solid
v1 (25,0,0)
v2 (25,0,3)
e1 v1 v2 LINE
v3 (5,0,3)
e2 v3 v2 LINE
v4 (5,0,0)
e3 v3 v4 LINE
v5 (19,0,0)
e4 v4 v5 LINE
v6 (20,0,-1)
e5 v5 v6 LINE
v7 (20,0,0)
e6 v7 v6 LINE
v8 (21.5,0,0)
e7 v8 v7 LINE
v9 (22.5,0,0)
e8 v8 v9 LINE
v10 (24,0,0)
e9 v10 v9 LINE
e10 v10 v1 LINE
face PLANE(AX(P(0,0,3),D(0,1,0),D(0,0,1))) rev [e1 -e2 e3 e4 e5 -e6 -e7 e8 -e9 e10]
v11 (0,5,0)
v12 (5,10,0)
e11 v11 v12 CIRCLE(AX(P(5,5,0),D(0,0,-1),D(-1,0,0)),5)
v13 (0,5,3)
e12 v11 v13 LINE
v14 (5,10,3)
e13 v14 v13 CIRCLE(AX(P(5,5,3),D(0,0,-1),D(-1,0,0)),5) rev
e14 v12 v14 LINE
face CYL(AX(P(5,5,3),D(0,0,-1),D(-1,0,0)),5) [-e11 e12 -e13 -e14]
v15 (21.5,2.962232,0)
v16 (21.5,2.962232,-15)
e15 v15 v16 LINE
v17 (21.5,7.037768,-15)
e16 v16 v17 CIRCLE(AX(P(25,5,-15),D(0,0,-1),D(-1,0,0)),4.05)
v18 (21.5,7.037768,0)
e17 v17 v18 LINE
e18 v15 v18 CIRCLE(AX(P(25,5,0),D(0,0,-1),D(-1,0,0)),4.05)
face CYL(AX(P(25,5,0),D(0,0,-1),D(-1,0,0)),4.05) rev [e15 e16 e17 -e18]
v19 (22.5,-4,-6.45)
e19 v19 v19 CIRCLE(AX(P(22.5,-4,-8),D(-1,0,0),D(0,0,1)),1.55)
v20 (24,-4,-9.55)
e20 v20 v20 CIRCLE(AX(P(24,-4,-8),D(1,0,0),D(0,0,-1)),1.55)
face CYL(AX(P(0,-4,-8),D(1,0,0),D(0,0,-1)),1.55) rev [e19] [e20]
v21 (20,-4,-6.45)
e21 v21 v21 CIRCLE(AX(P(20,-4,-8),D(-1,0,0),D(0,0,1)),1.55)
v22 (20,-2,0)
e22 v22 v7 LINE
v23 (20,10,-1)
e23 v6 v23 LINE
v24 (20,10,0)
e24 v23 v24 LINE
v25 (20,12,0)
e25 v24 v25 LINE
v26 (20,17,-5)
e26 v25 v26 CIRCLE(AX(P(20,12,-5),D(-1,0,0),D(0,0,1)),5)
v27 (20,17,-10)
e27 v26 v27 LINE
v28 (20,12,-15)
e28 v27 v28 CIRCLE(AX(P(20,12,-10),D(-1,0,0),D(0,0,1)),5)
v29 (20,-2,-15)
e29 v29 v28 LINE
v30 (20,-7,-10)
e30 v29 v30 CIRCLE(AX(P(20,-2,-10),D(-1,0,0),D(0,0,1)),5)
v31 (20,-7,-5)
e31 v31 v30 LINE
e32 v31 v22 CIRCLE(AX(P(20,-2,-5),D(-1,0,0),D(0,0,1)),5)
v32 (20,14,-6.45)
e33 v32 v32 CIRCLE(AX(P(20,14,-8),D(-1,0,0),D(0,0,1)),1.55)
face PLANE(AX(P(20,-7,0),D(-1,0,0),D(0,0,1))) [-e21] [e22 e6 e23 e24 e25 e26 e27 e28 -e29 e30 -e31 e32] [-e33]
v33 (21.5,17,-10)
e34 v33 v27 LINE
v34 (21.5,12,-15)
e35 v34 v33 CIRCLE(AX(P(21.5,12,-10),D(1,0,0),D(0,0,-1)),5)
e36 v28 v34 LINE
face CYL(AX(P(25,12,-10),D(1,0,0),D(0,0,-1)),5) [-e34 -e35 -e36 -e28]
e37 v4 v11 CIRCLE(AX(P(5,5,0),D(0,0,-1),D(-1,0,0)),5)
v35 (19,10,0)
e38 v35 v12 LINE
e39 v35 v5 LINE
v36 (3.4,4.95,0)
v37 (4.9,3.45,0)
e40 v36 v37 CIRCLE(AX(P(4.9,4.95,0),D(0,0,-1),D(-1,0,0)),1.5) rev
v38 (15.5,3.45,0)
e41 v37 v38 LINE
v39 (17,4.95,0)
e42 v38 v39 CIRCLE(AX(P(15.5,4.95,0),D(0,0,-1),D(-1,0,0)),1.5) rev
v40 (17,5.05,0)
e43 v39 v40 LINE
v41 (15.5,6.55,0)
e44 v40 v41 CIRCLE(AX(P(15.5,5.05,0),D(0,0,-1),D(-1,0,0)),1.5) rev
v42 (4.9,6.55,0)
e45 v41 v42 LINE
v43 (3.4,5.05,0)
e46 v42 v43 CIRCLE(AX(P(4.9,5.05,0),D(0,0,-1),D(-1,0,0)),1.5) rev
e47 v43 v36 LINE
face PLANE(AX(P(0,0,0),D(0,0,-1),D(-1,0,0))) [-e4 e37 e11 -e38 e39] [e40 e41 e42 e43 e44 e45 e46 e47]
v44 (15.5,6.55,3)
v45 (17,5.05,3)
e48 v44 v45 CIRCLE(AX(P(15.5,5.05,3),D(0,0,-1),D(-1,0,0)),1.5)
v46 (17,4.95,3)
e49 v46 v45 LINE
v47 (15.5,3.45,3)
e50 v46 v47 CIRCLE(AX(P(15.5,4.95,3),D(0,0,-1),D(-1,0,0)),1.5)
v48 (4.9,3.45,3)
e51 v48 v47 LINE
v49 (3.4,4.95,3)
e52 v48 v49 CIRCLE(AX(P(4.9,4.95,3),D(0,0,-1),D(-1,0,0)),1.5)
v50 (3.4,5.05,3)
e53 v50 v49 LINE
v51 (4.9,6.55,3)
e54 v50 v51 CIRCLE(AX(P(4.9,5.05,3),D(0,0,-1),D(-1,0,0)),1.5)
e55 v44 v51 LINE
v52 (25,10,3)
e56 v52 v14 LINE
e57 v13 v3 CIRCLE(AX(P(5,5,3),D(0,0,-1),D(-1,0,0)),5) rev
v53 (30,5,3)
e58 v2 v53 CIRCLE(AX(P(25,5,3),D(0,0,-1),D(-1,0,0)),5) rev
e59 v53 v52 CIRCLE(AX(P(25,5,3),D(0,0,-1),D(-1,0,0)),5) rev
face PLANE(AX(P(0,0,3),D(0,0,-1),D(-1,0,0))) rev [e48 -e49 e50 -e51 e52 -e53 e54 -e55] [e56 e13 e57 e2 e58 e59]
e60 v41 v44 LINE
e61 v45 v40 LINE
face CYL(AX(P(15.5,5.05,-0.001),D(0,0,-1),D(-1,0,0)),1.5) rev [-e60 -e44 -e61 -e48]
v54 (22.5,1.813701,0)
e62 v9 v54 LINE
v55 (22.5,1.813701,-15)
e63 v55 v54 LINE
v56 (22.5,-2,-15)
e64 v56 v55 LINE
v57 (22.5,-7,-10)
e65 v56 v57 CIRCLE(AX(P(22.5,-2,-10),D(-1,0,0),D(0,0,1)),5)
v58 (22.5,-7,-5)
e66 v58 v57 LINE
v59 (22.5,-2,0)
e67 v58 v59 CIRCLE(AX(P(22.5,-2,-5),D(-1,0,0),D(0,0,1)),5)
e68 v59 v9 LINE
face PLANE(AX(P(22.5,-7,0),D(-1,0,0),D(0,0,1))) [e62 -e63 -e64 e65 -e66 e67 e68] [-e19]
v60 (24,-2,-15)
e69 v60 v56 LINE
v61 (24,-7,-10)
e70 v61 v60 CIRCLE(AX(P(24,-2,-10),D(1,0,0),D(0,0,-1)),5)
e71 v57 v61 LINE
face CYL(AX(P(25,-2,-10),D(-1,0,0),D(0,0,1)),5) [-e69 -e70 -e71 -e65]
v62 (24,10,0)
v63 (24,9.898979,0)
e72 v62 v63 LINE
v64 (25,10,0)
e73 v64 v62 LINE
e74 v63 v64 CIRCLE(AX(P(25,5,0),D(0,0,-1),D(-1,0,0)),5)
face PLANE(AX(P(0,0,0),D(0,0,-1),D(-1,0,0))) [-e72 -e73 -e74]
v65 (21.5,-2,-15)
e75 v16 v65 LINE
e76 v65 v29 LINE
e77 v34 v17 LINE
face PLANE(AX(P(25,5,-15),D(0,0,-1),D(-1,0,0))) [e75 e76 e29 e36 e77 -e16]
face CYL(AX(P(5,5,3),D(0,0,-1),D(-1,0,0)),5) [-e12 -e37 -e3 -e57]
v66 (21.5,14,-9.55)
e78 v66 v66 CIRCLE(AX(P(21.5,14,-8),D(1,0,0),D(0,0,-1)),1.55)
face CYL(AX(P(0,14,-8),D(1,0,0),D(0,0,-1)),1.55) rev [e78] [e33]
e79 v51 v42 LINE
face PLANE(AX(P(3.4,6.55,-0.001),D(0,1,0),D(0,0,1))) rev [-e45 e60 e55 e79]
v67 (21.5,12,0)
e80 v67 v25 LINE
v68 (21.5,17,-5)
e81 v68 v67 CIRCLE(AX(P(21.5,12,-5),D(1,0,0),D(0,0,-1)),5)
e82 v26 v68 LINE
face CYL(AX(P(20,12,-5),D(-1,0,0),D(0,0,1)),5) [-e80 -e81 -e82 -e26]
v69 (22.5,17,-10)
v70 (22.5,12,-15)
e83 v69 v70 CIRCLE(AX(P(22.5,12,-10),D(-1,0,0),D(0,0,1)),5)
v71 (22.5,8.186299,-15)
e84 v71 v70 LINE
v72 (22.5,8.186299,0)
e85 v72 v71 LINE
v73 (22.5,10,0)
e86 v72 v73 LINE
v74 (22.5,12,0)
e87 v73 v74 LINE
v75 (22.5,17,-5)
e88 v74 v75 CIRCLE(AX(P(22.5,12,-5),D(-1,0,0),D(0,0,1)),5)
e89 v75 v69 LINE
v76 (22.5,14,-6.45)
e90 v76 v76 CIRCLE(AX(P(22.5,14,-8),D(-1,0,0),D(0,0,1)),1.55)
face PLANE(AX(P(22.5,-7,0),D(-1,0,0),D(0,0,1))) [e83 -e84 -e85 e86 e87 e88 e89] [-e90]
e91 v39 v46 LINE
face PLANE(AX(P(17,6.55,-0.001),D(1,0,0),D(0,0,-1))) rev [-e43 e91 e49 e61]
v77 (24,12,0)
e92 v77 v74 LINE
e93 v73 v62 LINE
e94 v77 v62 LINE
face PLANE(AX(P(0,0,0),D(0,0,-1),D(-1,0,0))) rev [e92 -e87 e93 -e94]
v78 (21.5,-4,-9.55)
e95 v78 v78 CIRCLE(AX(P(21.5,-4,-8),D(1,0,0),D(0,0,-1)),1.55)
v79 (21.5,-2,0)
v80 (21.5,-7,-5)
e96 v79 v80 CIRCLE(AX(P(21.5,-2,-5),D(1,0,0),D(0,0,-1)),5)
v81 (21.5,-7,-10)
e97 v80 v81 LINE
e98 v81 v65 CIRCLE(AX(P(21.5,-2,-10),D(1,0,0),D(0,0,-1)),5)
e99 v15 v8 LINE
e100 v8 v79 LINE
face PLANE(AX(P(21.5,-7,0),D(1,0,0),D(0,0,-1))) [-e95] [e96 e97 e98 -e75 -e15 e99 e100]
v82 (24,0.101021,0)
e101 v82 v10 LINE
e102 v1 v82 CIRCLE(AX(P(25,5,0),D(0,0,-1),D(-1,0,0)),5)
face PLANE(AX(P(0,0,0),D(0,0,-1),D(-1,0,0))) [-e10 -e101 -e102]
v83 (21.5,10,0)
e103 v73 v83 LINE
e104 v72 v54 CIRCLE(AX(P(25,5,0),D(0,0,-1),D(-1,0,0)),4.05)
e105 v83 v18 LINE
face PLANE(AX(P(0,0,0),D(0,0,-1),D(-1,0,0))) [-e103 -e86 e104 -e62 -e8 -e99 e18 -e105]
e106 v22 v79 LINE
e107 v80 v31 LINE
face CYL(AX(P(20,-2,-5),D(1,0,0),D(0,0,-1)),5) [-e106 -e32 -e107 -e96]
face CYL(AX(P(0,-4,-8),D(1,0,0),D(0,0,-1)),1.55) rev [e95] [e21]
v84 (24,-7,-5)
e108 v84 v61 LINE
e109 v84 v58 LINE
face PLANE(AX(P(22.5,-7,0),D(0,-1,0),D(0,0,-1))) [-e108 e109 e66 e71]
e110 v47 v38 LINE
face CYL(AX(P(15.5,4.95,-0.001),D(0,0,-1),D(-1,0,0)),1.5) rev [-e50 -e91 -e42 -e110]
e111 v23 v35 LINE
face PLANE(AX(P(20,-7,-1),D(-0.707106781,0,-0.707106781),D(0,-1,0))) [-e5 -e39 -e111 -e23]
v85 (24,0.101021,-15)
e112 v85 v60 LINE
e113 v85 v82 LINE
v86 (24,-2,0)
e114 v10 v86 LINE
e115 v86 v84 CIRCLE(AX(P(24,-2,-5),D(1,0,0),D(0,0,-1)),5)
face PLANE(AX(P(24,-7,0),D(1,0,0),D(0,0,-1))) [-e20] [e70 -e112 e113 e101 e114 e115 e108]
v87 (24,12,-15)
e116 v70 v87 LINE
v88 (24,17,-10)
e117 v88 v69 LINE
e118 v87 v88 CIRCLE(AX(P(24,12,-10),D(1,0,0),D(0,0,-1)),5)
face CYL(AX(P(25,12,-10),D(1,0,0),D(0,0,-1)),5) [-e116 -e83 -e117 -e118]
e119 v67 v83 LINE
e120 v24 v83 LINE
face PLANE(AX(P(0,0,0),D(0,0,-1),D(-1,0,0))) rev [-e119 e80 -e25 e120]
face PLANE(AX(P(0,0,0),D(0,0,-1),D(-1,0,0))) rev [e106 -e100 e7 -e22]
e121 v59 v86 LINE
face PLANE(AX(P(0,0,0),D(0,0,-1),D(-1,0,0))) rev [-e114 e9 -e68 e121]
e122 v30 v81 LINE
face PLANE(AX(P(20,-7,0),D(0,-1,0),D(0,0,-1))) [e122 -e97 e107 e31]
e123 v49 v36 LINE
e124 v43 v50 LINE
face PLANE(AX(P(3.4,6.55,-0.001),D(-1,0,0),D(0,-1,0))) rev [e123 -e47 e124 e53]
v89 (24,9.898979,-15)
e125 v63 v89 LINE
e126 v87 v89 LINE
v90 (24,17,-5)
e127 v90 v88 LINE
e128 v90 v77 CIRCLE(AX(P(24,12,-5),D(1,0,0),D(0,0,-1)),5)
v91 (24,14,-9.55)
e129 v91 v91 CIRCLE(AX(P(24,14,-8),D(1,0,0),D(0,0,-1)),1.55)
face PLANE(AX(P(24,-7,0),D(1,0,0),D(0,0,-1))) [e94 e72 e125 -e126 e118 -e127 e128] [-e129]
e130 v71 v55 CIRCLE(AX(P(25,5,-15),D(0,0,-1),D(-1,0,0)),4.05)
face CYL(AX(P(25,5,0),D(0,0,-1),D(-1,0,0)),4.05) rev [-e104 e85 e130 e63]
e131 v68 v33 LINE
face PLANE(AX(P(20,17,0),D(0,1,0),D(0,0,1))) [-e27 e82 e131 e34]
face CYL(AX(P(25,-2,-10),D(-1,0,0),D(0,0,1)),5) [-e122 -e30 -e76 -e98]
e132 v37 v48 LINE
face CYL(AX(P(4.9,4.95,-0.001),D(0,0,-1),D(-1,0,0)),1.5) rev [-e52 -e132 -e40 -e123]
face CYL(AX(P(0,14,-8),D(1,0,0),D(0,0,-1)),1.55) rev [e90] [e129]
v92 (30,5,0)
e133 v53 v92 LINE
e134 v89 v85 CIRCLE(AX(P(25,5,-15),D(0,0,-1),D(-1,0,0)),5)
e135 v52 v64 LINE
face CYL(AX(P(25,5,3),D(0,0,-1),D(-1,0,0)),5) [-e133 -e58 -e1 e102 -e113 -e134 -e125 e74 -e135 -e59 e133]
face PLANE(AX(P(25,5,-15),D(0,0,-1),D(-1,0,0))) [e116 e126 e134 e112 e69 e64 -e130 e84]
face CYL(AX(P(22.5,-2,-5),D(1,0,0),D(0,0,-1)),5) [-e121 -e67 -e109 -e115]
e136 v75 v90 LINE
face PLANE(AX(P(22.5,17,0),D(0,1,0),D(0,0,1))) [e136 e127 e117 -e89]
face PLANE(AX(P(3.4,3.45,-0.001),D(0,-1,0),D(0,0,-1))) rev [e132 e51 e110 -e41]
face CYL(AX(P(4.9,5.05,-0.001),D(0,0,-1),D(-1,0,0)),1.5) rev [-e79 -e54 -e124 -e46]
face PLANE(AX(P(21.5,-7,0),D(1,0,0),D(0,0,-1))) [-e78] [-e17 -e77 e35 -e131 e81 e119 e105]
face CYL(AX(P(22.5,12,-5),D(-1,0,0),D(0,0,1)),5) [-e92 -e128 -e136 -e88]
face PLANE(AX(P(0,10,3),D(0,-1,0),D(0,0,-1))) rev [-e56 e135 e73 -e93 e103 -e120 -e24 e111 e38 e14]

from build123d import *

# Parameters (mm, degrees)
SZKIC1_W                    = 30
SZKIC1_H                    = 10
DODANIE_WYCI_GNI_CIE1_DEPTH = 3
ZAOKR_GLENIE1_R             = 5
WYTNIJ_WYCI_GNI_CIE1_REACH  = 33.765
SZKIC2_W                    = 13.6
SZKIC2_H                    = 3.1
ZAOKR_GLENIE2_R             = 1.5
SZKIC3_R                    = 5
DODANIE_WYCI_GNI_CIE2_DEPTH = 15
SZKIC5_W                    = 1.5
SZKIC5_H                    = 24
DODANIE_WYCI_GNI_CIE3_DEPTH = 15
SZKIC4_R                    = 4.05
WYTNIJ_WYCI_GNI_CIE2_DEPTH  = 15
SZKIC6_W                    = 1
SZKIC6_H                    = 10.631374676
WYTNIJ_WYCI_GNI_CIE3_DEPTH  = 15
SZKIC7_R                    = 1.55
WYTNIJ_WYCI_GNI_CIE4_DEPTH  = 34.015148038
ZAOKR_GLENIE3_R             = 5
SFAZOWANIE1_SIZE            = 1


with BuildPart() as part:
    # Szkic1 → Dodanie-wyciągnięcie1 (new body)
    with BuildSketch(Plane.XY):
        with Locations((15, 5)):
            Rectangle(SZKIC1_W, SZKIC1_H)
    extrude(amount=DODANIE_WYCI_GNI_CIE1_DEPTH)

    # Zaokrąglenie1
    zaokr_glenie1_edges = [part.edges().sort_by_distance(p)[0] for p in [
        (0, 10, 1.5),
        (0, 0, 1.5),
        (30, 10, 1.5),
        (30, 0, 1.5),
    ]]
    fillet(zaokr_glenie1_edges, radius=ZAOKR_GLENIE1_R - 0.0001)  # a hair under: the kernel refuses the full size

    # Szkic2 → Wytnij-wyciągnięcie1 (cut, up to next)
    with BuildSketch(Plane.XY.offset(3), mode=Mode.PRIVATE) as wytnij_wyci_gni_cie1_sk1:
        with Locations((10.2, 5)):
            Rectangle(SZKIC2_W, SZKIC2_H)
    wytnij_wyci_gni_cie1_tool1 = extrude(wytnij_wyci_gni_cie1_sk1.sketch, amount=-WYTNIJ_WYCI_GNI_CIE1_REACH, mode=Mode.PRIVATE) & part.part
    add(wytnij_wyci_gni_cie1_tool1.solids().sort_by_distance((10.2, 5, 3))[0], mode=Mode.SUBTRACT)

    # Zaokrąglenie2
    zaokr_glenie2_edges = [part.edges().sort_by_distance(p)[0] for p in [
        (3.4, 3.45, 1.5),
        (3.4, 6.55, 1.5),
        (17, 6.55, 1.5),
        (17, 3.45, 1.5),
    ]]
    fillet(zaokr_glenie2_edges, radius=ZAOKR_GLENIE2_R)

    # Szkic3 → Dodanie-wyciągnięcie2 (add)
    with BuildSketch(Plane(origin=(0, 0, 0), x_dir=(-1, 0, 0), z_dir=(0, 0, -1))):
        with Locations((-25, 5)):
            Circle(SZKIC3_R)
    extrude(amount=DODANIE_WYCI_GNI_CIE2_DEPTH)

    # Szkic5 → Dodanie-wyciągnięcie3 (add)
    with BuildSketch(Plane(origin=(0, 0, -15), x_dir=(-1, 0, 0), z_dir=(0, 0, -1))):
        with Locations((-20.75, 5)):
            Rectangle(SZKIC5_W, SZKIC5_H)
        with Locations((-23.25, 5)):
            Rectangle(SZKIC5_W, SZKIC5_H)
    extrude(amount=-DODANIE_WYCI_GNI_CIE3_DEPTH)

    # Szkic4 → Wytnij-wyciągnięcie2 (cut)
    with BuildSketch(Plane(origin=(0, 0, -15), x_dir=(-1, 0, 0), z_dir=(0, 0, -1))):
        with Locations((-25, 5)):
            Circle(SZKIC4_R)
    extrude(amount=-WYTNIJ_WYCI_GNI_CIE2_DEPTH, mode=Mode.SUBTRACT)

    # Szkic6 → Wytnij-wyciągnięcie3 (cut)
    with BuildSketch(Plane(origin=(0, 0, -15), x_dir=(-1, 0, 0), z_dir=(0, 0, -1))):
        with Locations((-22, 4.629389041)):
            Rectangle(SZKIC6_W, SZKIC6_H)
    extrude(amount=-WYTNIJ_WYCI_GNI_CIE3_DEPTH, mode=Mode.SUBTRACT)

    # Szkic7 → Wytnij-wyciągnięcie4 (cut, through all)
    with BuildSketch(Plane(origin=(24, 0, 0), x_dir=(0, 0, -1), z_dir=(1, 0, 0))):
        with Locations((8, -4)):
            Circle(SZKIC7_R)
        with Locations((8, 14)):
            Circle(SZKIC7_R)
    extrude(amount=-WYTNIJ_WYCI_GNI_CIE4_DEPTH, mode=Mode.SUBTRACT)

    # Zaokrąglenie3
    zaokr_glenie3_edges = [part.edges().sort_by_distance(p)[0] for p in [
        (23.25, -7, -15),
        (23.25, -7, 0),
        (23.25, 17, 0),
        (23.25, 17, -15),
        (20.75, -7, -15),
        (20.75, -7, 0),
        (20.75, 17, 0),
        (20.75, 17, -15),
    ]]
    fillet(zaokr_glenie3_edges, radius=ZAOKR_GLENIE3_R)

    # Sfazowanie1
    sfazowanie1_edges = [part.edges().sort_by_distance(p)[0] for p in [
        (20, 5, 0),
    ]]
    chamfer(sfazowanie1_edges, length=SFAZOWANIE1_SIZE)


solid = part.part
